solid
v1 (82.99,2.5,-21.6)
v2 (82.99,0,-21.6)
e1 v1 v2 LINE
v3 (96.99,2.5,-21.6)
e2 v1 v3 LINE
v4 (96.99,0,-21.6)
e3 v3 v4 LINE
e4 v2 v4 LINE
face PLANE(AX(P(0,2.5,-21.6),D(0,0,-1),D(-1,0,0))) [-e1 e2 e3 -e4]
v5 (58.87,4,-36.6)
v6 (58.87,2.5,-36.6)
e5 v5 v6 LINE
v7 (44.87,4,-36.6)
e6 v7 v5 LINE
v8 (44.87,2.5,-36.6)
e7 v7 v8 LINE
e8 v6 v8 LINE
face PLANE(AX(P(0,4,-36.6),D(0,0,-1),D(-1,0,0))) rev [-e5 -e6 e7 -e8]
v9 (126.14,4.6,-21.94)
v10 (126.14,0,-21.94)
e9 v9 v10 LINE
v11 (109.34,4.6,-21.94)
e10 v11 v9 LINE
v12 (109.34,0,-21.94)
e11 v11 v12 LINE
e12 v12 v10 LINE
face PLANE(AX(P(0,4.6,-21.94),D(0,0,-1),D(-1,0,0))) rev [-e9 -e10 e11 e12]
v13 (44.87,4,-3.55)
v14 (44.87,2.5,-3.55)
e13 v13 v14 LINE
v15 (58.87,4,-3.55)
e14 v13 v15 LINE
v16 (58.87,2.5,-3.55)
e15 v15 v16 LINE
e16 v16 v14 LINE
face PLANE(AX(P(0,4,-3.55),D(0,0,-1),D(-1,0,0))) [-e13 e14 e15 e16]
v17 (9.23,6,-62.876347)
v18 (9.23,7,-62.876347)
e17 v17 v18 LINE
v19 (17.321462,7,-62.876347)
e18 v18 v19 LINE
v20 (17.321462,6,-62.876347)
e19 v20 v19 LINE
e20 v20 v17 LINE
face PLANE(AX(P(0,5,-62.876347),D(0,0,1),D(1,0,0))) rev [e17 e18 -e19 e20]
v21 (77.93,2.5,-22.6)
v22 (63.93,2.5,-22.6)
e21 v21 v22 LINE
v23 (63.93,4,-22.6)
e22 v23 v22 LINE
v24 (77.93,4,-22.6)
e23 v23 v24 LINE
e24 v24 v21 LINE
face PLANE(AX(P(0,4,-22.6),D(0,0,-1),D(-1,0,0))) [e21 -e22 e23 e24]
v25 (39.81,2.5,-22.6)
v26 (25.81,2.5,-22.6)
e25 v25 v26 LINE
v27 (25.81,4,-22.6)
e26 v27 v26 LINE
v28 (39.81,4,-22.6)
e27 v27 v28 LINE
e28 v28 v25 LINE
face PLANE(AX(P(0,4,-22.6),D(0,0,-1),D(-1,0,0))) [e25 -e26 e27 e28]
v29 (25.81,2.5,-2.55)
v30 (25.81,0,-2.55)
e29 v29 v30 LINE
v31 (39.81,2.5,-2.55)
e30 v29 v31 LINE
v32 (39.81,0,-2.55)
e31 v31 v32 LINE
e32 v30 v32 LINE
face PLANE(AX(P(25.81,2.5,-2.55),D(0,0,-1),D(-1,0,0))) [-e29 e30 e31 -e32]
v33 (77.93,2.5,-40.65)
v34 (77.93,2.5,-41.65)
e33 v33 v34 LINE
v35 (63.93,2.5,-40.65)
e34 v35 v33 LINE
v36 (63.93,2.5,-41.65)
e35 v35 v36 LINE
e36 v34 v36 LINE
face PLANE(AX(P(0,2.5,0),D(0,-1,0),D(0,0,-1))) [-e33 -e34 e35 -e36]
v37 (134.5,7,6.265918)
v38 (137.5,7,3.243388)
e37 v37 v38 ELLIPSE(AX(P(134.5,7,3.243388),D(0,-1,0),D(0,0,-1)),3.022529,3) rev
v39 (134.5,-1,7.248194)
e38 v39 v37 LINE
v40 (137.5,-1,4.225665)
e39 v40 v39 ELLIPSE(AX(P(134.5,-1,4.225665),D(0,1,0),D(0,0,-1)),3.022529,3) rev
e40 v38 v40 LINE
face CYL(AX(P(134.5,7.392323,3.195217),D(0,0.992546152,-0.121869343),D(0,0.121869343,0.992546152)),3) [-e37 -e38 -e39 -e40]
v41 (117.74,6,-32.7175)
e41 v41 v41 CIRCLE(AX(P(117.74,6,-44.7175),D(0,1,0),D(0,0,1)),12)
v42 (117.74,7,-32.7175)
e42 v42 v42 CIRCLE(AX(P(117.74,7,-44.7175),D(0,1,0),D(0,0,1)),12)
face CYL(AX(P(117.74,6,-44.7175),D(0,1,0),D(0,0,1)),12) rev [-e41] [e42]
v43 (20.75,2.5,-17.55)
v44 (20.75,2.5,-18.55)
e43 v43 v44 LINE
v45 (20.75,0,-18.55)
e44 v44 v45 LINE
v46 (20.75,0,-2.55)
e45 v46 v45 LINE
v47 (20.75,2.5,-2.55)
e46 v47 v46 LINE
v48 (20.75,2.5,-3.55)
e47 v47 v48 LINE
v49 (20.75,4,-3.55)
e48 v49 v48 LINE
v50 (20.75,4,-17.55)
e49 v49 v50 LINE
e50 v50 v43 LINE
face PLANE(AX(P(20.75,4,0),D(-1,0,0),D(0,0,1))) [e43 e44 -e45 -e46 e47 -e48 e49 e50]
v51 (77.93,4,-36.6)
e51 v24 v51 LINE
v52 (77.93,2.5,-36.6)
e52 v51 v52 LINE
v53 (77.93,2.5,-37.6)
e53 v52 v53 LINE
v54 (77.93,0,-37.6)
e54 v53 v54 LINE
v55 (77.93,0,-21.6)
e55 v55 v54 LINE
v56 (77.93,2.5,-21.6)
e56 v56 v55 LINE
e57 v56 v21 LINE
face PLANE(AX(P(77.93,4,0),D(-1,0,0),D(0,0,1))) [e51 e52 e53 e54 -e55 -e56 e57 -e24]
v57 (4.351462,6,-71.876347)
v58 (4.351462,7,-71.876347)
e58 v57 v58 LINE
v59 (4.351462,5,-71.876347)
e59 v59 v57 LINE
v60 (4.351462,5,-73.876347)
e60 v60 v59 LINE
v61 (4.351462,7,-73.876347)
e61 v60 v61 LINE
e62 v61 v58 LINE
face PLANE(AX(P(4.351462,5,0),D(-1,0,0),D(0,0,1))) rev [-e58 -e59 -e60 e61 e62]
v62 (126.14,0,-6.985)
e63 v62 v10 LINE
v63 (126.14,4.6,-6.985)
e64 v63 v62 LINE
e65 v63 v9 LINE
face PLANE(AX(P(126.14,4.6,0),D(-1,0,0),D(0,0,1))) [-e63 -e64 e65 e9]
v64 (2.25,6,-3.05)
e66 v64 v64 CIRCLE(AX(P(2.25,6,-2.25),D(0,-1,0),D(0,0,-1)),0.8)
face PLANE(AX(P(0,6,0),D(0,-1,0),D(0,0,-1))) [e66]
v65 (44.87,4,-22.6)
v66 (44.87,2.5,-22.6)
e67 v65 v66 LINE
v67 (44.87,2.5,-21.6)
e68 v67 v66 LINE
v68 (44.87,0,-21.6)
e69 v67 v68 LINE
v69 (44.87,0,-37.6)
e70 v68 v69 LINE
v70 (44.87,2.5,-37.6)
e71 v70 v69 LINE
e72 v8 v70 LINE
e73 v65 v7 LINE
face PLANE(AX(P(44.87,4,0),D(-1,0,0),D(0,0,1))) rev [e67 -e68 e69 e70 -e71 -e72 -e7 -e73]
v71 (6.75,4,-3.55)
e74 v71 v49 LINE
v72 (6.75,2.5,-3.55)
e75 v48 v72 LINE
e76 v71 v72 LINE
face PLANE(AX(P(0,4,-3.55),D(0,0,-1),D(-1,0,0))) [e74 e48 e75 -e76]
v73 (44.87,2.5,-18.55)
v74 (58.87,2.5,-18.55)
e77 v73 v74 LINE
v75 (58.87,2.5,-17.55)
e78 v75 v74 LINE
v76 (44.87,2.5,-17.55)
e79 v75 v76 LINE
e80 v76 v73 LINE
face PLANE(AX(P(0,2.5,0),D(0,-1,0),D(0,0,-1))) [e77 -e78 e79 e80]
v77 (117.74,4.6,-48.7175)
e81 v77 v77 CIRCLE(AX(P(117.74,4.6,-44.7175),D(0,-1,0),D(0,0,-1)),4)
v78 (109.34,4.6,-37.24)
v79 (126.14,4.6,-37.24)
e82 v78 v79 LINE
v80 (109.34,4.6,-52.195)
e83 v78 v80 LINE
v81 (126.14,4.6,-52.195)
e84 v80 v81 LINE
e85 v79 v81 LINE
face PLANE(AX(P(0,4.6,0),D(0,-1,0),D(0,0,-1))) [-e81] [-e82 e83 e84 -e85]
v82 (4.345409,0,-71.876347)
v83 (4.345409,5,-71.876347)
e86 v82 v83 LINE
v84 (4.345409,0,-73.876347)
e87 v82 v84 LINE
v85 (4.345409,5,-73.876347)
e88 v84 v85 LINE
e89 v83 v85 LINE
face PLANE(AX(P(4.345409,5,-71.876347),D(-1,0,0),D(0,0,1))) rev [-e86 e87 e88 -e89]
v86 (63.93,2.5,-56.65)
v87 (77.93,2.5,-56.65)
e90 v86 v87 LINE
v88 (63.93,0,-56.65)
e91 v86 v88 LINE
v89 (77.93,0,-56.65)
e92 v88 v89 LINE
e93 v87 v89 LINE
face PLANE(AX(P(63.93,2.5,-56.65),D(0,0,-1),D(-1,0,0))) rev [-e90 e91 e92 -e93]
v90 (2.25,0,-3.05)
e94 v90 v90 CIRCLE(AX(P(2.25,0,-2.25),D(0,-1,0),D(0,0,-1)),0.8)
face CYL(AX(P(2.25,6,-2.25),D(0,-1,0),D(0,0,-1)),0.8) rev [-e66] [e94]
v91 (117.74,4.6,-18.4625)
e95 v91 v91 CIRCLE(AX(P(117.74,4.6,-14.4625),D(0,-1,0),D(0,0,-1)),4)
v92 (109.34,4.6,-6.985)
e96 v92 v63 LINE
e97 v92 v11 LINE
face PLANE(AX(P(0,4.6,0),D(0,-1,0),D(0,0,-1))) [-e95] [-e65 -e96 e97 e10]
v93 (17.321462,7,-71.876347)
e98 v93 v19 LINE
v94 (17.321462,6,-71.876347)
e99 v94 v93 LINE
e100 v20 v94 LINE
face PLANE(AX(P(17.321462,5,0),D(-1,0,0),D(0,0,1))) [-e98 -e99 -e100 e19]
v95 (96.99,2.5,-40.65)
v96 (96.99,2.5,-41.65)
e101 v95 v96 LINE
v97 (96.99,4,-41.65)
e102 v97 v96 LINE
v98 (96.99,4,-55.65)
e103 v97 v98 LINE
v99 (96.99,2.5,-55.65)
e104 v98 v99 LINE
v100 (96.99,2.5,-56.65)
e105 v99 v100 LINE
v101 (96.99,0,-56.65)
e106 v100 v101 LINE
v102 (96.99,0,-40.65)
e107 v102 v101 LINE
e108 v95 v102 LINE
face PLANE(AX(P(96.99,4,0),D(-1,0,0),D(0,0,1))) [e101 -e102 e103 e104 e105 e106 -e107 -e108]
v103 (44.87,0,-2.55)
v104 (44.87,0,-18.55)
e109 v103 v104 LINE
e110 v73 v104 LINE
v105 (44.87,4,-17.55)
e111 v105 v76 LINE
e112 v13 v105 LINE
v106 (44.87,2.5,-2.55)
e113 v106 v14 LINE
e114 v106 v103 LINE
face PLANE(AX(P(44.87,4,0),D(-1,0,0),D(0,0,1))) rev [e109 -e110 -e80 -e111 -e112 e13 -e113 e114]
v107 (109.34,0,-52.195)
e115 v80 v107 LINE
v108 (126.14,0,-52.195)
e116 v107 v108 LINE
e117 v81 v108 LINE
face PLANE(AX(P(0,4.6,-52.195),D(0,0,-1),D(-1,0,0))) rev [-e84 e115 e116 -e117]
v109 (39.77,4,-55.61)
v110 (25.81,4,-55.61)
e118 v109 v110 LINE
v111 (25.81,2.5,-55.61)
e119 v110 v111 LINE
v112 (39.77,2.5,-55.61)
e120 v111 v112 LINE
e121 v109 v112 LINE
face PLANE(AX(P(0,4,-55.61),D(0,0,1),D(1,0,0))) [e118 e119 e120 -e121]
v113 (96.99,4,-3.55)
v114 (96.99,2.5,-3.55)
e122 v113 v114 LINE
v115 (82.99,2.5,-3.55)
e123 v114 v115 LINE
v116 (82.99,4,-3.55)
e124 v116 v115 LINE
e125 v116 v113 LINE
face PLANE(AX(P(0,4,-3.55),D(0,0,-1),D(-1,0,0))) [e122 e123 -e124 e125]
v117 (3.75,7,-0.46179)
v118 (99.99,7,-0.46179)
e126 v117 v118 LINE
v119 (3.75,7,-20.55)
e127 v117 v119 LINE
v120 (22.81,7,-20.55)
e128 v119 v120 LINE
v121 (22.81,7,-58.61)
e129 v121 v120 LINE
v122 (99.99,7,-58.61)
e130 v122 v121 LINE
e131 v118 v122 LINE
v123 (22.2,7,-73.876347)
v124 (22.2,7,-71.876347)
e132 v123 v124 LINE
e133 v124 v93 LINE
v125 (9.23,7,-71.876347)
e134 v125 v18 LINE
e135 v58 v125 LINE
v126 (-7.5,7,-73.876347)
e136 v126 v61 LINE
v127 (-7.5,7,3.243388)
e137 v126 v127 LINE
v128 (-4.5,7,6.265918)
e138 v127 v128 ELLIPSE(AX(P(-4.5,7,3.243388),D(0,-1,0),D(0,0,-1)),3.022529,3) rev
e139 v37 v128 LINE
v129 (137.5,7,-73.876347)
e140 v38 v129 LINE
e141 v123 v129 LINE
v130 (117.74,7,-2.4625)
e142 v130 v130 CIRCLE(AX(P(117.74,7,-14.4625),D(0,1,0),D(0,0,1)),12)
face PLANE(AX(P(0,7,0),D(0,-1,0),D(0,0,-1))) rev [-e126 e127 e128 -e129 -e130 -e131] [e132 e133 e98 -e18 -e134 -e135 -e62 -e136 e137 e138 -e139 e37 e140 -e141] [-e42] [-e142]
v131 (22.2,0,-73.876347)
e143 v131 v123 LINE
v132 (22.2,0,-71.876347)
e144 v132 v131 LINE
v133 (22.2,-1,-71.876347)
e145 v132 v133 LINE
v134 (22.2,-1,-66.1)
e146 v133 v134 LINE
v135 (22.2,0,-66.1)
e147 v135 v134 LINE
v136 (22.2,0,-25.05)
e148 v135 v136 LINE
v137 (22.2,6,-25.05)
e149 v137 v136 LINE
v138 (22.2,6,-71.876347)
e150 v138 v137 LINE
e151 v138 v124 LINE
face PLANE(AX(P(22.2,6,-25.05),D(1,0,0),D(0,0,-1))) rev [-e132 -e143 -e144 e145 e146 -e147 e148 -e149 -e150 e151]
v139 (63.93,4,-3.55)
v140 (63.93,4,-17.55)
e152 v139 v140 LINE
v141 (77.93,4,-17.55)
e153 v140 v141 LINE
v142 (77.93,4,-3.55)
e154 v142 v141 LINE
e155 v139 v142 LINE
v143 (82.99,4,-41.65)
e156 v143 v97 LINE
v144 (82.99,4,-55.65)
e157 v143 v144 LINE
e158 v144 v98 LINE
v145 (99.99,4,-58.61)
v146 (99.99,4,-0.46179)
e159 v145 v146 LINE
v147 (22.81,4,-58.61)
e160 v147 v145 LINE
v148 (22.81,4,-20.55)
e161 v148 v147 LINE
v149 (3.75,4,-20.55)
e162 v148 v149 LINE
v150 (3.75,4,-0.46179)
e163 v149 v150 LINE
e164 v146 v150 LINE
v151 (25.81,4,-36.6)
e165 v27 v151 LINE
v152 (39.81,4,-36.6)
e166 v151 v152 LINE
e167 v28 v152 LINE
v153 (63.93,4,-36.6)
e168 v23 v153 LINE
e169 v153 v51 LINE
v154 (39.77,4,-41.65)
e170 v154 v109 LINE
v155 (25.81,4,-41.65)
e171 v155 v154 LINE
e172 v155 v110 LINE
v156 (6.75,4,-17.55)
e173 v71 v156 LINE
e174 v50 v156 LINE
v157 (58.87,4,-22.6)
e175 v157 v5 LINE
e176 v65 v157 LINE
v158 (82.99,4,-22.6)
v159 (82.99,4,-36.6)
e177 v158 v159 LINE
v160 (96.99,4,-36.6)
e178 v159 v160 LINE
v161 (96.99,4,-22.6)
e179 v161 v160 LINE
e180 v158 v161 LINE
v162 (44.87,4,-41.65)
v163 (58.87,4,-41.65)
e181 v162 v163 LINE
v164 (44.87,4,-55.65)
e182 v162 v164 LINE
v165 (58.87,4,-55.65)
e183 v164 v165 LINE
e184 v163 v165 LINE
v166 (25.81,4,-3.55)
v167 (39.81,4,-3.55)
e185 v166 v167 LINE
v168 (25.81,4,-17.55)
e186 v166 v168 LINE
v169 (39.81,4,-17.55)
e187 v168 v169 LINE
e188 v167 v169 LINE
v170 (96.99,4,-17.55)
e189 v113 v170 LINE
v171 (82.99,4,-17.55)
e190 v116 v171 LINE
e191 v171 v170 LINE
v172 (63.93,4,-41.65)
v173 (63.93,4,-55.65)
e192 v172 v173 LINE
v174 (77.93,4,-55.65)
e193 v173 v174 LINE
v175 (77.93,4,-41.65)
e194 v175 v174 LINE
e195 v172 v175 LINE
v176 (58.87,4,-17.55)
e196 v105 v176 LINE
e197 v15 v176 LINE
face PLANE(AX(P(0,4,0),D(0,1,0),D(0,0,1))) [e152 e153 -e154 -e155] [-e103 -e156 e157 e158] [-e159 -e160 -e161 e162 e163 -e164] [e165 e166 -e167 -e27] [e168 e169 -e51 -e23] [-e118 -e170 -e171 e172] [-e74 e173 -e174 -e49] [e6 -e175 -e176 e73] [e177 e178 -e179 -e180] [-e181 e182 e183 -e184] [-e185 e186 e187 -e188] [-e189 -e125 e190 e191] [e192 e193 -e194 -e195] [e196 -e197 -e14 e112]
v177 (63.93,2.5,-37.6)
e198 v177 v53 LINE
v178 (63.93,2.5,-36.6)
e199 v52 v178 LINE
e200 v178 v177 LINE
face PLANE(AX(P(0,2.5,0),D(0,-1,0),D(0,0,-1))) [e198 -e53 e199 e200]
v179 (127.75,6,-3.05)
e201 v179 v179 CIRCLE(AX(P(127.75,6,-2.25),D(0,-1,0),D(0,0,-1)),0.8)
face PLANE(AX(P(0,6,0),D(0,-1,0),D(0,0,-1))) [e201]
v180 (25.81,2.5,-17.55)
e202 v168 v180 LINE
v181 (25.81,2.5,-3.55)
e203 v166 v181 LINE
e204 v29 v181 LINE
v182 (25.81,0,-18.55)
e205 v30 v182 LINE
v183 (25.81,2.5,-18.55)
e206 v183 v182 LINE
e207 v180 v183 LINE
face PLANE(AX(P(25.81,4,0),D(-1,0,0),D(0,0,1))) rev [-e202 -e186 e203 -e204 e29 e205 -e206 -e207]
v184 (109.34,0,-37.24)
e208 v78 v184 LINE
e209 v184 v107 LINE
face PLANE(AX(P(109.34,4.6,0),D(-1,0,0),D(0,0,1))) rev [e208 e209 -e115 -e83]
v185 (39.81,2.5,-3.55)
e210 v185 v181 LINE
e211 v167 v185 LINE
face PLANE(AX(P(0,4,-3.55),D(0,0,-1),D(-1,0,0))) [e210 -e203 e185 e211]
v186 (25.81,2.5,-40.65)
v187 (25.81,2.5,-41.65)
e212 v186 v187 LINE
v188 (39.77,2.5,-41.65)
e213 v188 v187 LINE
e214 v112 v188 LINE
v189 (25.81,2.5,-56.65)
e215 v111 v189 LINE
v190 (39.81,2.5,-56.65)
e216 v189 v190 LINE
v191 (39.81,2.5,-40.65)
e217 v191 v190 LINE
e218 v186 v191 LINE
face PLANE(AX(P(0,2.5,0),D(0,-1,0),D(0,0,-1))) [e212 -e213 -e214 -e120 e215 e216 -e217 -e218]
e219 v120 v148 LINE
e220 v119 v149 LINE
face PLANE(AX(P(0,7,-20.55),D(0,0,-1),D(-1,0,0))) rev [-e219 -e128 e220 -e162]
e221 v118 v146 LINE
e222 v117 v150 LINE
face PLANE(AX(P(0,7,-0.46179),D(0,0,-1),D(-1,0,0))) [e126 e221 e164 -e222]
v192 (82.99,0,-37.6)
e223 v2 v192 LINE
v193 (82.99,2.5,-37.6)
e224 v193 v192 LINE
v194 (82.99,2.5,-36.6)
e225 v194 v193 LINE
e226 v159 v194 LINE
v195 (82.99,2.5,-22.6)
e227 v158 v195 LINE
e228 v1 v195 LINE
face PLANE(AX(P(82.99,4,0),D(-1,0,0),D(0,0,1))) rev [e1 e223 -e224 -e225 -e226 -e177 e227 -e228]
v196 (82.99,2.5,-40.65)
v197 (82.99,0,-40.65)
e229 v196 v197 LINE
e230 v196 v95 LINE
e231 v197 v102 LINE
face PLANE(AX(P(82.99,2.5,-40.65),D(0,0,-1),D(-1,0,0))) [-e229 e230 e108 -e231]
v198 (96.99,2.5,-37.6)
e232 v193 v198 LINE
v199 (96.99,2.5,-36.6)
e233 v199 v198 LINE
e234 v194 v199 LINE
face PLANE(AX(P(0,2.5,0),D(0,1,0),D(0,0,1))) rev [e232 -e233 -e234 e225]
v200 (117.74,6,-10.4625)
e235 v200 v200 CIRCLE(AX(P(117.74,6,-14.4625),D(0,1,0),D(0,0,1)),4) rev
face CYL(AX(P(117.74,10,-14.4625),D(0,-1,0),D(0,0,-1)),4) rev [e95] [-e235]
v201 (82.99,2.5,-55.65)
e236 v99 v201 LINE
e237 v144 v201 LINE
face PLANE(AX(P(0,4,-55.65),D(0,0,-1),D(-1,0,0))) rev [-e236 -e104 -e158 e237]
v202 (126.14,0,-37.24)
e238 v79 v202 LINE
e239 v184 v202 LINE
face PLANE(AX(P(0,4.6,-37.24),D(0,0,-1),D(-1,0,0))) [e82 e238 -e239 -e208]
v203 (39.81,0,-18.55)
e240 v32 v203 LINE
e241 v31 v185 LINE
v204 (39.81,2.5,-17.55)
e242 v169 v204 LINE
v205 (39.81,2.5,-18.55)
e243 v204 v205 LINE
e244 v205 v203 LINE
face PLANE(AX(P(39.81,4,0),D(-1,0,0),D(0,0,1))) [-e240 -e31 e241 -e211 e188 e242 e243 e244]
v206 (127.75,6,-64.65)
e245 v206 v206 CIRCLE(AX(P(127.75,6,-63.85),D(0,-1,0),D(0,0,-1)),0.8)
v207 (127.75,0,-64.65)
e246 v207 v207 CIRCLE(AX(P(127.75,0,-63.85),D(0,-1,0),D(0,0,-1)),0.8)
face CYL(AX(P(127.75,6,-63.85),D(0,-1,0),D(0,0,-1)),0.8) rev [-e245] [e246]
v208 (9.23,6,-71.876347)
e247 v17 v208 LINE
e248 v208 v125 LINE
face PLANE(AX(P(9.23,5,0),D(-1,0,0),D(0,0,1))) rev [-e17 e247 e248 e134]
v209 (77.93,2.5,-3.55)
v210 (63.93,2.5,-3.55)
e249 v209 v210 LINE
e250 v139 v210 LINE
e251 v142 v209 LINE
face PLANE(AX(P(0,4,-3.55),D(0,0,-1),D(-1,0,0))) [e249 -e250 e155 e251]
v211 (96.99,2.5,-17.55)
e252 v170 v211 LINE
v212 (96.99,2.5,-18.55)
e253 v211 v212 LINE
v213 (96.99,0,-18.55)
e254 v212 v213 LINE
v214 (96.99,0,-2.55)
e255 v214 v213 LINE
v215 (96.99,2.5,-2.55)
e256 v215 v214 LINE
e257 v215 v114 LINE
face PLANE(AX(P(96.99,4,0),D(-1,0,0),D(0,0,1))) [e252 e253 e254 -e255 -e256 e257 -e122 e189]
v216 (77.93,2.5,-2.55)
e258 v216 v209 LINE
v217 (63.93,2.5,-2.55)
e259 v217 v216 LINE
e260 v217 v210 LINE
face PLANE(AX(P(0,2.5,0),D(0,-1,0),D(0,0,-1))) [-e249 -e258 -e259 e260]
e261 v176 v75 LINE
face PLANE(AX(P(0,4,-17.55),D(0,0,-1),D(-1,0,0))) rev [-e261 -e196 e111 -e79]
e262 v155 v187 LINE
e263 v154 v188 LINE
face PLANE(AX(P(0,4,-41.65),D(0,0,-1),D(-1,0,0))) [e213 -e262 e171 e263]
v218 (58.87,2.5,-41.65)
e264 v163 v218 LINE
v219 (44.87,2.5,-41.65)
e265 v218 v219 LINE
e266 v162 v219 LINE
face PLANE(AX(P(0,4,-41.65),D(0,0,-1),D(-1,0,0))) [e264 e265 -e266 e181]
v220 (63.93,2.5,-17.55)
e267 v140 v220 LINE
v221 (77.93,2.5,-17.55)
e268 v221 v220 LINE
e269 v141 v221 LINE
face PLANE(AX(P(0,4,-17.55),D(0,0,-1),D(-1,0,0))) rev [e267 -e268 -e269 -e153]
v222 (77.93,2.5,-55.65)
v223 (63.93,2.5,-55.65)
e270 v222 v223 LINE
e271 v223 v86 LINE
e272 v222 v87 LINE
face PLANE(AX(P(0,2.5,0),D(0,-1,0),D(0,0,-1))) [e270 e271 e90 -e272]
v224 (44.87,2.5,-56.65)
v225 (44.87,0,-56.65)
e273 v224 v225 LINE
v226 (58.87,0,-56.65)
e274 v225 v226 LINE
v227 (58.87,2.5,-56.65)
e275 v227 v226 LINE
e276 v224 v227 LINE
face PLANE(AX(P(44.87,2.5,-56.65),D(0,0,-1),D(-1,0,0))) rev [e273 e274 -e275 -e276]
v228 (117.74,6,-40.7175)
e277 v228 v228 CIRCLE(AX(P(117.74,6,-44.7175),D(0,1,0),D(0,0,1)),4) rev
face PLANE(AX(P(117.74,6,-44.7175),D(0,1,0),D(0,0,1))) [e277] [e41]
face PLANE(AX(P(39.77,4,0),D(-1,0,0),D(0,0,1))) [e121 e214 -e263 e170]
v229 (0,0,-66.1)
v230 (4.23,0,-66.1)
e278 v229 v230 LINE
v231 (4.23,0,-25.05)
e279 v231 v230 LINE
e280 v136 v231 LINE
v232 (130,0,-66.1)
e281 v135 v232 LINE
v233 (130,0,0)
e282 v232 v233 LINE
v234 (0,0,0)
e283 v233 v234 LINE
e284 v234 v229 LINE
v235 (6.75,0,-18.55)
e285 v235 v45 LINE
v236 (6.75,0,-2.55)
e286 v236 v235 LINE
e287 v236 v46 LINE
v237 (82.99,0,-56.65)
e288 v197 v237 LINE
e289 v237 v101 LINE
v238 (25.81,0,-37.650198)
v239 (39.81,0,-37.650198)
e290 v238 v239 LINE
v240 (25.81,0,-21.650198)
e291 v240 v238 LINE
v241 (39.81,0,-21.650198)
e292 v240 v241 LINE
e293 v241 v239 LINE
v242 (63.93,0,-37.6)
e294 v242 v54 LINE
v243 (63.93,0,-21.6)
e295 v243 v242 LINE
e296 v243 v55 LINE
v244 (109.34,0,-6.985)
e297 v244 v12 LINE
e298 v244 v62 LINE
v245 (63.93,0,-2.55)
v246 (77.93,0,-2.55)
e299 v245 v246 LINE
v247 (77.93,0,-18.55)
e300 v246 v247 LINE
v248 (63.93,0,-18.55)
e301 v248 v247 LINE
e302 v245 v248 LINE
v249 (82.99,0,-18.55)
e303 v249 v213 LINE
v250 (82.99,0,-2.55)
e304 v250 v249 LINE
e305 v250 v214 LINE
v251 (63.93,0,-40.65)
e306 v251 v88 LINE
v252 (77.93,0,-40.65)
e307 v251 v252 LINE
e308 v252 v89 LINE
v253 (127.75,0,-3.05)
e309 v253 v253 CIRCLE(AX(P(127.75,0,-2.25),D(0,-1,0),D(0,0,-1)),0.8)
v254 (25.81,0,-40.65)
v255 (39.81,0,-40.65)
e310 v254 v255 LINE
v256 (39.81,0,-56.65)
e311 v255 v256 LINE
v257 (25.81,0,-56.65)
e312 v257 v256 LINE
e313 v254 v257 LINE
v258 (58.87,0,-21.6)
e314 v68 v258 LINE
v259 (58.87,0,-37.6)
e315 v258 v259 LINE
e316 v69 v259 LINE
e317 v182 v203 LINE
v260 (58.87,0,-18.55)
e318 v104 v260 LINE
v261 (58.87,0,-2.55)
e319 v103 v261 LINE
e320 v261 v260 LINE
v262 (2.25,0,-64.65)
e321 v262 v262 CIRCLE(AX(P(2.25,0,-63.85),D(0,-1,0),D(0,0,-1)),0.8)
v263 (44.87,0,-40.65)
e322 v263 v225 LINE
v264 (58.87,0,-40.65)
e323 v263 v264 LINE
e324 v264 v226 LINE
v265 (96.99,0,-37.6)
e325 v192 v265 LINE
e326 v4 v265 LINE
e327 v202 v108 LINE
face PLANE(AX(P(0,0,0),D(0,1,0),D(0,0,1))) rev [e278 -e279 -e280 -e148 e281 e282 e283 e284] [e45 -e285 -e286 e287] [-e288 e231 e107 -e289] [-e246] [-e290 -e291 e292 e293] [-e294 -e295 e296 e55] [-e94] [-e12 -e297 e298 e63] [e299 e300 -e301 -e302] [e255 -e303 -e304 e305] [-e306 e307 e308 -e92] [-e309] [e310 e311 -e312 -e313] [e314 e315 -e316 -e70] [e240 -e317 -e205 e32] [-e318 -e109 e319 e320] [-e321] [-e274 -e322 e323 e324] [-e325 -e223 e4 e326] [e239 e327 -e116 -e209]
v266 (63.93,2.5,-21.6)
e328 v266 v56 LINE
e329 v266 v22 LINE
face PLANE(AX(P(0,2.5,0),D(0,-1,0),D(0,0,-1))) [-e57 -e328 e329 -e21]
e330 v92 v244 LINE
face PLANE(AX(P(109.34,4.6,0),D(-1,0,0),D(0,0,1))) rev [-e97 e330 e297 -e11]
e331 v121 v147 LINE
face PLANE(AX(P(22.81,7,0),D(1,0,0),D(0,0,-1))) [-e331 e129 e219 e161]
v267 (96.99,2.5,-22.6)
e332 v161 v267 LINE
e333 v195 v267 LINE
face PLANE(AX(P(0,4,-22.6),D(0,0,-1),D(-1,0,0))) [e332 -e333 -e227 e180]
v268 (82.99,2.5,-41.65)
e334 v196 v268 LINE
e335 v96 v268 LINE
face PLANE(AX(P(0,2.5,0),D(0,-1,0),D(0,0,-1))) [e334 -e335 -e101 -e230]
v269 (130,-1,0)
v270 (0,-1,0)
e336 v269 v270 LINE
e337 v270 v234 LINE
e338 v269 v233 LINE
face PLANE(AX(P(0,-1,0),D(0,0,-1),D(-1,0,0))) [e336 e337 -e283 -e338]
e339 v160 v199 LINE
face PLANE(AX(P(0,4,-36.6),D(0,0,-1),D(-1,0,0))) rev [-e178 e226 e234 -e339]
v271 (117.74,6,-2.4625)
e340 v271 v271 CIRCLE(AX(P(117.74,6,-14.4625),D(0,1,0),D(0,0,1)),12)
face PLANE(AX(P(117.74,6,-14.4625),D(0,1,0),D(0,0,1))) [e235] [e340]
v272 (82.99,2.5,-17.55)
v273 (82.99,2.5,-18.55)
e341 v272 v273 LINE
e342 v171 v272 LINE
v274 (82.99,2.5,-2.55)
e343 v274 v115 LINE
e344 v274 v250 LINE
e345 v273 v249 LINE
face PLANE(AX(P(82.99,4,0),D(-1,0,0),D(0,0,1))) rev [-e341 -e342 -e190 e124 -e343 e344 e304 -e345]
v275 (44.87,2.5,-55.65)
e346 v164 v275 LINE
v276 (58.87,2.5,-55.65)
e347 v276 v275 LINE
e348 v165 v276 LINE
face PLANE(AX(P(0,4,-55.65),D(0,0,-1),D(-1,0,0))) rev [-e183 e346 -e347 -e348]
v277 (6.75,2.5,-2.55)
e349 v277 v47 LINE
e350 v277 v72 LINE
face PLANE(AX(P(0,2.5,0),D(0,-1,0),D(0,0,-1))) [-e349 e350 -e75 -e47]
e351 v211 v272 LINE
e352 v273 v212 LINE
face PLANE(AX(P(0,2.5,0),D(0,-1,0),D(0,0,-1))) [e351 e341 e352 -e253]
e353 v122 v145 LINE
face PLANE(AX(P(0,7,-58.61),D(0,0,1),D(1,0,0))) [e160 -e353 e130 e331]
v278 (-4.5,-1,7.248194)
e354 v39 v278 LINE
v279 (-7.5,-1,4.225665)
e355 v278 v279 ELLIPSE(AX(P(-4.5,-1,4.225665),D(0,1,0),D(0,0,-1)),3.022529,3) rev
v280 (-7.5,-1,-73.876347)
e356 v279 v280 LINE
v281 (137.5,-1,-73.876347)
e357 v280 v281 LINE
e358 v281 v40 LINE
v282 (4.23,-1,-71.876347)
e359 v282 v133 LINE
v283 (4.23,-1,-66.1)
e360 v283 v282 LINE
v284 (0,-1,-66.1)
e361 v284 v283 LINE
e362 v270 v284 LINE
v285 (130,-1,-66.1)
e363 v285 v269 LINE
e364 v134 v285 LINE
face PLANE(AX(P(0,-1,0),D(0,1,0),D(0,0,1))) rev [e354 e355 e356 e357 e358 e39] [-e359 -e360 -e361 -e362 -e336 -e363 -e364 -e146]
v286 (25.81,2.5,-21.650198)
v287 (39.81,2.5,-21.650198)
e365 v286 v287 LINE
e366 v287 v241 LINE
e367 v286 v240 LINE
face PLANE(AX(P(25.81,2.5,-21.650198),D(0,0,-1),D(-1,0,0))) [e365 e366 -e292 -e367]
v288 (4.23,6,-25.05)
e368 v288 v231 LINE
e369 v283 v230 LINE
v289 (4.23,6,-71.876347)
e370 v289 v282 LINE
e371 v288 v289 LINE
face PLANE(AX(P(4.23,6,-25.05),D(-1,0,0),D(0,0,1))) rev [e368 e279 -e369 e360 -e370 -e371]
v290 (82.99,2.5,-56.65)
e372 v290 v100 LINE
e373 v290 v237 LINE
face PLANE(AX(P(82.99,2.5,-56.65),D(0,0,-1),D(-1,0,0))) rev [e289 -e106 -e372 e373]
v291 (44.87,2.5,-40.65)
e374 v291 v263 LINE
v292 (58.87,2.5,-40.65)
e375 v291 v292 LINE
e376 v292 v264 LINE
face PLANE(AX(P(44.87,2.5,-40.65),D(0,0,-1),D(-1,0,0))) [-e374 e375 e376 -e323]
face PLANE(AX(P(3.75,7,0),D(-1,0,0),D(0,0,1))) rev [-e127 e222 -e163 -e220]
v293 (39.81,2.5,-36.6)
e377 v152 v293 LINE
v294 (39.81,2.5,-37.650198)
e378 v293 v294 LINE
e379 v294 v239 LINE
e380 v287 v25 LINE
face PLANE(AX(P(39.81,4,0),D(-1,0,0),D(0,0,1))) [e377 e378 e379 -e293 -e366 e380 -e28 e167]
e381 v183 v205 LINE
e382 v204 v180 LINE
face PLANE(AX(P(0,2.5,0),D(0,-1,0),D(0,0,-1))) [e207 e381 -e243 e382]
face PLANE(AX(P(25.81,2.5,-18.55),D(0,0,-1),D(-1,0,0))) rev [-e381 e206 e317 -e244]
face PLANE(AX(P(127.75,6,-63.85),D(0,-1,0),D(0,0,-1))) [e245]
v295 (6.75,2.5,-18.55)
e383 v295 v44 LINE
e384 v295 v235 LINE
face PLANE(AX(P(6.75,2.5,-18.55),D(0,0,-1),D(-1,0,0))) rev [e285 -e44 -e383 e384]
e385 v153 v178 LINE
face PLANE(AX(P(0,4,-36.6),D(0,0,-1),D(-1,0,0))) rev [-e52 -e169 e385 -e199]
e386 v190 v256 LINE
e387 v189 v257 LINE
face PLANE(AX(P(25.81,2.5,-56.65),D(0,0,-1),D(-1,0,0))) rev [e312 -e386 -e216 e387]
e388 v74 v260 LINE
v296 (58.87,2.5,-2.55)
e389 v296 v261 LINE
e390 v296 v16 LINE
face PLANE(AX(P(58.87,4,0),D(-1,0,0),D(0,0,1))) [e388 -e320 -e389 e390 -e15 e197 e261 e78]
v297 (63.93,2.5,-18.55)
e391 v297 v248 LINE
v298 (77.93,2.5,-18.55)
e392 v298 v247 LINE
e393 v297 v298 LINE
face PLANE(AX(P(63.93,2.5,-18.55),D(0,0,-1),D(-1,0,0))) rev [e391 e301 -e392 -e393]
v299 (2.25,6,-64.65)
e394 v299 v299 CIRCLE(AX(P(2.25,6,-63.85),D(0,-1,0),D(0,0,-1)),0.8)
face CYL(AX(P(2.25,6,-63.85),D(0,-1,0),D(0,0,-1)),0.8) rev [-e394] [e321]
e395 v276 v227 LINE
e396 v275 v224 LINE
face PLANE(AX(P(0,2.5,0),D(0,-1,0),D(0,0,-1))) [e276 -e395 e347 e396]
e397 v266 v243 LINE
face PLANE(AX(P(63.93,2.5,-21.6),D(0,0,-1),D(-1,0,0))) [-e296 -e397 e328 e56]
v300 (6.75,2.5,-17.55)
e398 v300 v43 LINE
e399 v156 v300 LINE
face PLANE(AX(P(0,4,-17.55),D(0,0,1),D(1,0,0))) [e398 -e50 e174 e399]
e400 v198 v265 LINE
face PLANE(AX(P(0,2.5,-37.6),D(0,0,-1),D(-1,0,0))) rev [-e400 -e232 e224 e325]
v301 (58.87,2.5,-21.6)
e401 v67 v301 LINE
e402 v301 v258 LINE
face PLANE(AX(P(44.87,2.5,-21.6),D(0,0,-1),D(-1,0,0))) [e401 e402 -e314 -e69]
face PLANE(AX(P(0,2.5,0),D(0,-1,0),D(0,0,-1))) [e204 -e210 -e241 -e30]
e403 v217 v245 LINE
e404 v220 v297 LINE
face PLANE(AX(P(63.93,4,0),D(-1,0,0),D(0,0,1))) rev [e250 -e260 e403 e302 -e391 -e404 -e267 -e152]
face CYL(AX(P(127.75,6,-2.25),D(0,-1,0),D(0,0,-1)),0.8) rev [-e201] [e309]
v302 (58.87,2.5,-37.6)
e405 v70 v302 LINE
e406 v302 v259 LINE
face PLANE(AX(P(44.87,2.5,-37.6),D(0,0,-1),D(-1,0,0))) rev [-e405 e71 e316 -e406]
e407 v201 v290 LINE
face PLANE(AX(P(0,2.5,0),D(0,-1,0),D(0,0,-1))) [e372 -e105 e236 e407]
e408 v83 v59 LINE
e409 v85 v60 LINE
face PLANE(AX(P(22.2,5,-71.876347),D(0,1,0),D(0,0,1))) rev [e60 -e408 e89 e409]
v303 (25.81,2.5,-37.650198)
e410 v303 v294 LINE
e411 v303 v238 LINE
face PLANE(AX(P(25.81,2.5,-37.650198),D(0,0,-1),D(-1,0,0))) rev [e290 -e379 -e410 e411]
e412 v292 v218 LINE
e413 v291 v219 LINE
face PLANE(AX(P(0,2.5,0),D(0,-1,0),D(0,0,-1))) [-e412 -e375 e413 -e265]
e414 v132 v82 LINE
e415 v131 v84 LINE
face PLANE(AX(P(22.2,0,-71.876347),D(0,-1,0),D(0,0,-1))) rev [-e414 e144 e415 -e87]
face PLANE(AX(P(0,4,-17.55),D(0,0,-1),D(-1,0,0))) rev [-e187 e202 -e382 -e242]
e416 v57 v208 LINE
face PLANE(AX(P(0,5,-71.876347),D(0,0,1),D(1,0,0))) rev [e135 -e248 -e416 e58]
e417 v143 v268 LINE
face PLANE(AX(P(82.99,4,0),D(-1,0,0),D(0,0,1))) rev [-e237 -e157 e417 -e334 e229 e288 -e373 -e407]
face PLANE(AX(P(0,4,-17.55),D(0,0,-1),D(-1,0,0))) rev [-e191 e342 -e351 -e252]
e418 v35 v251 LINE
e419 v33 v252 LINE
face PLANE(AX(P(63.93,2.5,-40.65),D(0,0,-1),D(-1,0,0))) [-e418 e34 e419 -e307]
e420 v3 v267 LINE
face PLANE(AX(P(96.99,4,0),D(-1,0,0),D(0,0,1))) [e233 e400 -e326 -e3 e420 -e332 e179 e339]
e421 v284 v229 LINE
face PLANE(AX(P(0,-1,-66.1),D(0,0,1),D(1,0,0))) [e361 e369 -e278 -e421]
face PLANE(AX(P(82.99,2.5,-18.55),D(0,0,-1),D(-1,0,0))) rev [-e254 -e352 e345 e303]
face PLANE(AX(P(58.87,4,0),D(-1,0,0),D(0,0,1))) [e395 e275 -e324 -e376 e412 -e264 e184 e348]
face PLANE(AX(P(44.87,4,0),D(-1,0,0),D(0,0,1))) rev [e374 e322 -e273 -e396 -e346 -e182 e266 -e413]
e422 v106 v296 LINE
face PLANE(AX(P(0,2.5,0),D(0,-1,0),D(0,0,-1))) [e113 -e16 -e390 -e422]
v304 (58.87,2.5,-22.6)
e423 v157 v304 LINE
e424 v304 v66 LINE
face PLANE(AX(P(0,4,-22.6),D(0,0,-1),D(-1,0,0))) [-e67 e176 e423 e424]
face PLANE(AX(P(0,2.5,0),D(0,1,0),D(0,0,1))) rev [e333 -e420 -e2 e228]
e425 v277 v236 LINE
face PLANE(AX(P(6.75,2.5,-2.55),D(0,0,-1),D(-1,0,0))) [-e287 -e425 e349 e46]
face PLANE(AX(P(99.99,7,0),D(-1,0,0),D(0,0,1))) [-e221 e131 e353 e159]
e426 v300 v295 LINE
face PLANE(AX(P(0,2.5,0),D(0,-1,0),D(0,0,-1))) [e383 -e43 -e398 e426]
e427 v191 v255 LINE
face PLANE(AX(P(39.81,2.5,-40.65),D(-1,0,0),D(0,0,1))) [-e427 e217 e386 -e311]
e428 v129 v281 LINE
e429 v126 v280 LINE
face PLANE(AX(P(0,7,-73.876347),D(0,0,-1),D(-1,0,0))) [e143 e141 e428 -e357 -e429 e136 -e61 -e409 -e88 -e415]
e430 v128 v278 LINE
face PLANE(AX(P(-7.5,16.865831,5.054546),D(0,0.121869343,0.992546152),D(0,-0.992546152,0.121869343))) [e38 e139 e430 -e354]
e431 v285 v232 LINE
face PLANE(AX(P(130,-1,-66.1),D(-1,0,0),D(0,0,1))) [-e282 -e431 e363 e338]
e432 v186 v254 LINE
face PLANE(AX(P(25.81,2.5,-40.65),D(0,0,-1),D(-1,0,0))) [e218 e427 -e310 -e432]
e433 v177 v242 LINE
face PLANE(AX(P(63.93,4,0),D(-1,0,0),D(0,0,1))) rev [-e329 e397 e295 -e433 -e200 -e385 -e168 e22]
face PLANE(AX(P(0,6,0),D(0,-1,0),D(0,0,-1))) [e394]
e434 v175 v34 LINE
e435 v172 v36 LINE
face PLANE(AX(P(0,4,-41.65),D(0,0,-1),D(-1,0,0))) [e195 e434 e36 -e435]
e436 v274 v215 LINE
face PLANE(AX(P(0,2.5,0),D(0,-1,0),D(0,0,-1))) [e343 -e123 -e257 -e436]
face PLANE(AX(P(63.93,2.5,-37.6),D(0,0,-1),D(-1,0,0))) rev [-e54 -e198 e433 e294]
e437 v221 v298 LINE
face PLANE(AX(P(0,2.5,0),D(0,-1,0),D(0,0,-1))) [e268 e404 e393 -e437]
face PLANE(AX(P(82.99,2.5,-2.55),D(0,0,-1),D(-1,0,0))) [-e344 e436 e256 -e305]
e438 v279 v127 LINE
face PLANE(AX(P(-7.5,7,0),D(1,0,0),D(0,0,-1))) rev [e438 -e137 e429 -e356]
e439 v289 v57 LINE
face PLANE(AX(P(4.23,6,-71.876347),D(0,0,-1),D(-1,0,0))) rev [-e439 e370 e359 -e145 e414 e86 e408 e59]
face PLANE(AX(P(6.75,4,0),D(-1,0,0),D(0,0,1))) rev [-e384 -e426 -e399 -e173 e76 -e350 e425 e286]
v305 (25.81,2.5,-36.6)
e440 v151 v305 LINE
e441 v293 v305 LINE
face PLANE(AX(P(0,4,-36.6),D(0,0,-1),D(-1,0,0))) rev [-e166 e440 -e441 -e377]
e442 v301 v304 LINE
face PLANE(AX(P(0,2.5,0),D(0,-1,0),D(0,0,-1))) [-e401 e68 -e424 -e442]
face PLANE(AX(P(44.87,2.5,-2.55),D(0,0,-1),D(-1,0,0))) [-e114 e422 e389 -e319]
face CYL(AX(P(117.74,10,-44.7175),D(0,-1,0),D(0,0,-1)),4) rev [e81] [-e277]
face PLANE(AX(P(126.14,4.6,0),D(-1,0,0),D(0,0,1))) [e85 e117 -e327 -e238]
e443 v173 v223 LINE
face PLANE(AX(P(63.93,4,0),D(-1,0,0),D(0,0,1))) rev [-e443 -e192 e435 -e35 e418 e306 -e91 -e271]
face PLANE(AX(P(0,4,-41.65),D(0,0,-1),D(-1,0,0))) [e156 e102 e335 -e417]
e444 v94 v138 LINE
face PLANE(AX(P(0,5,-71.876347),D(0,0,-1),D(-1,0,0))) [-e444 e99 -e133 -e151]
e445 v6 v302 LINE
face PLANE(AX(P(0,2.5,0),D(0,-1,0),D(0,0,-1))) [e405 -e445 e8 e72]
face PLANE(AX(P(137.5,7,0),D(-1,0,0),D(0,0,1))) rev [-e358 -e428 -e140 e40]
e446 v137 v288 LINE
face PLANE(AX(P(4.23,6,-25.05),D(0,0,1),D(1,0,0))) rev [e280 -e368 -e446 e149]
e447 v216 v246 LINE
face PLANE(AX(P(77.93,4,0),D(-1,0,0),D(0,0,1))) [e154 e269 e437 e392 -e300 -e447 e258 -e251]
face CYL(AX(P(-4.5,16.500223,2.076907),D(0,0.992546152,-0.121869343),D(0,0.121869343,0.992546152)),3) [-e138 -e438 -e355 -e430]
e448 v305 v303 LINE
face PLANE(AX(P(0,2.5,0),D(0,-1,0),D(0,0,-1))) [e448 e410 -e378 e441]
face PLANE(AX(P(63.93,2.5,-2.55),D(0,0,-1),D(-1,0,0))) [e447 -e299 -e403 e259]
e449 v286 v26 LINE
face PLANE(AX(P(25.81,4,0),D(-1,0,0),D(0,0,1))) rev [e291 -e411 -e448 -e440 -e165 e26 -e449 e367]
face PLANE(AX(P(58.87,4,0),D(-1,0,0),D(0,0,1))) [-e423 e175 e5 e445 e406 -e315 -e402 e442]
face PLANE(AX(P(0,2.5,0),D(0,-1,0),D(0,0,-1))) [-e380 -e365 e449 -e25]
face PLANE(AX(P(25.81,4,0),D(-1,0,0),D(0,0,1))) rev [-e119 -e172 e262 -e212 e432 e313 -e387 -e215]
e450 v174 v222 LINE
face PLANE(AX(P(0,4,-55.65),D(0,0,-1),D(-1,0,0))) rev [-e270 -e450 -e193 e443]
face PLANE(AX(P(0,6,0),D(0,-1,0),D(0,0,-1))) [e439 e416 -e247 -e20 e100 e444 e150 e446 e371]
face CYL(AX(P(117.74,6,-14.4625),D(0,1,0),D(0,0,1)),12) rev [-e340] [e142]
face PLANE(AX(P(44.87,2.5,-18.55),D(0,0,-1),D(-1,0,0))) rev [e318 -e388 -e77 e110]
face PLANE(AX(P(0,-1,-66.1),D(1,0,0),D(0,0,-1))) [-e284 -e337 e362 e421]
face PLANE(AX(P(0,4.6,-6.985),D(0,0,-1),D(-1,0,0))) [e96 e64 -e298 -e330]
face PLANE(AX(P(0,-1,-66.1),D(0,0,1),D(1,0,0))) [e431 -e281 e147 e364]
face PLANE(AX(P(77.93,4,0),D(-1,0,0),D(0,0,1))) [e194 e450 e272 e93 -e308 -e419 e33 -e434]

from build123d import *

# Parameters (mm, degrees)
SKETCH1_W           = 14
SKETCH1_H           = 14
SKETCH1_W_2         = 13.96
SKETCH1_H_2         = 13.96
SKETCH1_W_3         = 17.83
SKETCH1_H_3         = 34.365
SKETCH1_W_4         = 16.8
SKETCH1_H_4         = 14.955
BOSS_EXTRUDE2_DEPTH = 4
SKETCH3_W           = 14
SKETCH3_H           = 16
CUT_EXTRUDE1_DEPTH  = 2.5
SKETCH6_W           = 145
SKETCH6_H           = 81.124541
BOSS_EXTRUDE3_DEPTH = 7
SKETCH12_R          = 0.8
CUT_EXTRUDE5_DEPTH  = 6
SKETCH13_W          = 17.97
SKETCH13_H          = 46.826347
CUT_EXTRUDE6_DEPTH  = 6
SKETCH14_W          = 16.8
SKETCH14_H          = 14.955
CUT_EXTRUDE8_DEPTH  = 4.6
SKETCH15_R          = 4
CUT_EXTRUDE9_DEPTH  = 10
SKETCH16_R          = 12
CUT_EXTRUDE10_DEPTH = 1
SKETCH20_W          = 145
SKETCH20_H          = 81.124541
SKETCH20_W_2        = 130
SKETCH20_H_2        = 66.1
BOSS_EXTRUDE5_DEPTH = 1
SKETCH21_W          = 145
SKETCH21_H          = 34.866824831
CUT_EXTRUDE11_DEPTH = 18
FILLET1_R           = 3
SKETCH27_W          = 17.97
SKETCH27_H          = 5.776347
CUT_EXTRUDE13_DEPTH = 2
CUT_EXTRUDE14_START = -2
CUT_EXTRUDE14_DEPTH = 2
SKETCH28_W          = 17.854591413
SKETCH28_H          = 5
CUT_EXTRUDE15_DEPTH = 2


# Read off the part's stored shape, not the designer's step: Cut-Extrude14
with BuildPart() as part:
    # Sketch1 → Boss-Extrude2 (new body)
    with BuildSketch(Plane(origin=(0, 0, 0), x_dir=(1, 0, 0), z_dir=(0, 1, 0))):
        Polygon((0, 0), (109.34, 0), (130, 0), (130, 66.1), (0, 66.1), align=None)
        with Locations((51.87, 10.55)):
            Rectangle(SKETCH1_W, SKETCH1_H, mode=Mode.SUBTRACT)
        with Locations((32.81, 10.55)):
            Rectangle(SKETCH1_W, SKETCH1_H, mode=Mode.SUBTRACT)
        with Locations((32.81, 29.6)):
            Rectangle(SKETCH1_W, SKETCH1_H, mode=Mode.SUBTRACT)
        with Locations((32.79, 48.63)):
            Rectangle(SKETCH1_W_2, SKETCH1_H_2, mode=Mode.SUBTRACT)
        with Locations((13.145, 42.2325)):
            Rectangle(SKETCH1_W_3, SKETCH1_H_3, mode=Mode.SUBTRACT)
        with Locations((13.75, 10.55)):
            Rectangle(SKETCH1_W, SKETCH1_H, mode=Mode.SUBTRACT)
        with Locations((51.87, 29.6)):
            Rectangle(SKETCH1_W, SKETCH1_H, mode=Mode.SUBTRACT)
        with Locations((70.93, 10.55)):
            Rectangle(SKETCH1_W, SKETCH1_H, mode=Mode.SUBTRACT)
        with Locations((89.99, 10.55)):
            Rectangle(SKETCH1_W, SKETCH1_H, mode=Mode.SUBTRACT)
        with Locations((117.74, 14.4625)):
            Rectangle(SKETCH1_W_4, SKETCH1_H_4, mode=Mode.SUBTRACT)
        with Locations((70.93, 29.6)):
            Rectangle(SKETCH1_W, SKETCH1_H, mode=Mode.SUBTRACT)
        with Locations((89.99, 29.6)):
            Rectangle(SKETCH1_W, SKETCH1_H, mode=Mode.SUBTRACT)
        with Locations((51.87, 48.65)):
            Rectangle(SKETCH1_W, SKETCH1_H, mode=Mode.SUBTRACT)
        with Locations((70.93, 48.65)):
            Rectangle(SKETCH1_W, SKETCH1_H, mode=Mode.SUBTRACT)
        with Locations((89.99, 48.65)):
            Rectangle(SKETCH1_W, SKETCH1_H, mode=Mode.SUBTRACT)
        with Locations((117.74, 44.7175)):
            Rectangle(SKETCH1_W_4, SKETCH1_H_4, mode=Mode.SUBTRACT)
    extrude(amount=BOSS_EXTRUDE2_DEPTH)

    # Sketch3 → Cut-Extrude1 (cut)
    with BuildSketch(Plane(origin=(0, 0, 0), x_dir=(1, 0, 0), z_dir=(0, 1, 0))):
        with Locations((89.99, 29.6)):
            Rectangle(SKETCH3_W, SKETCH3_H)
        with Locations((70.93, 29.6)):
            Rectangle(SKETCH3_W, SKETCH3_H)
        with Locations((89.99, 48.65)):
            Rectangle(SKETCH3_W, SKETCH3_H)
        with Locations((70.93, 48.65)):
            Rectangle(SKETCH3_W, SKETCH3_H)
        with Locations((51.87, 48.65)):
            Rectangle(SKETCH3_W, SKETCH3_H)
        with Locations((32.81, 48.65)):
            Rectangle(SKETCH3_W, SKETCH3_H)
        with Locations((32.81, 29.650197757)):
            Rectangle(SKETCH3_W, SKETCH3_H)
        with Locations((51.87, 29.6)):
            Rectangle(SKETCH3_W, SKETCH3_H)
        with Locations((13.75, 10.55)):
            Rectangle(SKETCH3_W, SKETCH3_H)
        with Locations((32.81, 10.55)):
            Rectangle(SKETCH3_W, SKETCH3_H)
        with Locations((51.87, 10.55)):
            Rectangle(SKETCH3_W, SKETCH3_H)
        with Locations((70.93, 10.55)):
            Rectangle(SKETCH3_W, SKETCH3_H)
        with Locations((89.99, 10.55)):
            Rectangle(SKETCH3_W, SKETCH3_H)
    extrude(amount=CUT_EXTRUDE1_DEPTH, mode=Mode.SUBTRACT)

    # Sketch6 → Boss-Extrude3 (add)
    with BuildSketch(Plane(origin=(0, 0, 0), x_dir=(-1, 0, 0), z_dir=(0, -1, 0))):
        with Locations((-65, 33.3140765)):
            Rectangle(SKETCH6_W, SKETCH6_H)
        Polygon((-99.99, 58.61), (-39.77, 58.61), (-22.81, 58.61), (-22.81, 53.222321133), (-22.81, 20.55), (-3.75, 20.55), (-3.75, 12.496372948), (-3.75, 0.461789698), (-20.75, 0.461789698), (-99.99, 0.461789698), align=None, mode=Mode.SUBTRACT)
    extrude(amount=-BOSS_EXTRUDE3_DEPTH)

    # Sketch12 → Cut-Extrude5 (cut)
    with BuildSketch(Plane(origin=(0, 0, 0), x_dir=(-1, 0, 0), z_dir=(0, -1, 0))):
        with BuildLine():
            ThreePointArc((-1.45, 63.85), (-1.684314575, 64.415685425), (-2.25, 64.65))
            Line((-2.25, 64.65), (-2.25, 63.85))
            Line((-2.25, 63.85), (-1.45, 63.85))
        make_face()
        with BuildLine():
            Line((-2.25, 63.85), (-2.25, 64.65))
            ThreePointArc((-2.25, 64.65), (-2.815685425, 63.284314575), (-1.45, 63.85))
            Line((-1.45, 63.85), (-2.25, 63.85))
        make_face()
        with BuildLine():
            ThreePointArc((-1.45, 2.25), (-2.815685425, 2.815685425), (-2.25, 1.45))
            Line((-2.25, 1.45), (-2.25, 2.25))
            Line((-2.25, 2.25), (-1.45, 2.25))
        make_face()
        with BuildLine():
            Line((-2.25, 2.25), (-2.25, 1.45))
            ThreePointArc((-2.25, 1.45), (-1.684314575, 1.684314575), (-1.45, 2.25))
            Line((-1.45, 2.25), (-2.25, 2.25))
        make_face()
        with BuildLine():
            ThreePointArc((-128.55, 2.25), (-128.315685425, 1.684314575), (-127.75, 1.45))
            Line((-127.75, 1.45), (-127.75, 2.25))
            Line((-127.75, 2.25), (-128.55, 2.25))
        make_face()
        with BuildLine():
            Line((-127.75, 2.25), (-127.75, 1.45))
            ThreePointArc((-127.75, 1.45), (-127.184314575, 1.684314575), (-126.95, 2.25))
            ThreePointArc((-126.95, 2.25), (-127.75, 3.05), (-128.55, 2.25))
            Line((-128.55, 2.25), (-127.75, 2.25))
        make_face()
        with Locations(Location((-127.75, 63.85, 0), (0, 0, 90))):
            Circle(SKETCH12_R)
    extrude(amount=-CUT_EXTRUDE5_DEPTH, mode=Mode.SUBTRACT)

    # Sketch13 → Cut-Extrude6 (cut)
    with BuildSketch(Plane.XZ):
        with Locations((13.215, -48.4631735)):
            Rectangle(SKETCH13_W, SKETCH13_H)
    extrude(amount=-CUT_EXTRUDE6_DEPTH, mode=Mode.SUBTRACT)

    # Sketch14 → Cut-Extrude8 (cut)
    with BuildSketch(Plane.XZ):
        with Locations((117.74, -14.4625)):
            Rectangle(SKETCH14_W, SKETCH14_H)
        with Locations((117.74, -44.7175)):
            Rectangle(SKETCH14_W, SKETCH14_H)
    extrude(amount=-CUT_EXTRUDE8_DEPTH, mode=Mode.SUBTRACT)

    # Sketch15 → Cut-Extrude9 (cut)
    with BuildSketch(Plane.XZ):
        with Locations(Location((117.74, -44.7175, 0), (0, 0, 270))):
            Circle(SKETCH15_R)
        with Locations(Location((117.74, -14.4625, 0), (0, 0, 270))):
            Circle(SKETCH15_R)
    extrude(amount=-CUT_EXTRUDE9_DEPTH, mode=Mode.SUBTRACT)

    # Sketch16 → Cut-Extrude10 (cut)
    with BuildSketch(Plane(origin=(0, 7, 0), x_dir=(1, 0, 0), z_dir=(0, 1, 0))):
        with Locations(Location((117.74, 44.7175, 0), (0, 0, 270))):
            Circle(SKETCH16_R)
        with Locations(Location((117.74, 14.4625, 0), (0, 0, 270))):
            Circle(SKETCH16_R)
    extrude(amount=-CUT_EXTRUDE10_DEPTH, mode=Mode.SUBTRACT)

    # Sketch20 → Boss-Extrude5 (add)
    with BuildSketch(Plane.XZ):
        with Locations((65, -33.3140765)):
            Rectangle(SKETCH20_W, SKETCH20_H)
        with Locations((65, -33.05)):
            Rectangle(SKETCH20_W_2, SKETCH20_H_2, mode=Mode.SUBTRACT)
    extrude(amount=BOSS_EXTRUDE5_DEPTH)

    # Sketch21 → Cut-Extrude11 (cut)
    with BuildSketch(Plane(origin=(0, -1.861896279, 0.228612117), x_dir=(-1, 0, 0), z_dir=(0, 0.9925461516413211, -0.1218693434051548))):
        with Locations((-65, 24.505710134)):
            Rectangle(SKETCH21_W, SKETCH21_H)
    extrude(amount=CUT_EXTRUDE11_DEPTH, mode=Mode.SUBTRACT)

    # Fillet1
    fillet1_edges = [part.edges().sort_by_distance(p)[0] for p in [
        (-7.5, 3, 6.757055756),
        (137.5, 3, 6.757055756),
    ]]
    fillet(fillet1_edges, radius=FILLET1_R)

    # Sketch27 → Cut-Extrude13 (cut)
    with BuildSketch(Plane.XZ):
        with Locations((13.215, -68.9881735)):
            Rectangle(SKETCH27_W, SKETCH27_H)
    extrude(amount=CUT_EXTRUDE13_DEPTH, mode=Mode.SUBTRACT)

    # Cut-Extrude14 outline → Cut-Extrude14 (cut)
    with BuildSketch(Plane(origin=(0, 7, 0), x_dir=(1, 0, 0), z_dir=(0, 1, 0)).offset(CUT_EXTRUDE14_START)):
        Polygon((4.351462148, 71.876347), (9.23, 71.876347), (9.23, 62.876347), (17.321462297, 62.876347), (17.321462297, 71.876347), (22.2, 71.876347), (22.2, 73.876347), (4.351462148, 73.876347), align=None)
    extrude(amount=CUT_EXTRUDE14_DEPTH, mode=Mode.SUBTRACT)

    # Sketch28 → Cut-Extrude15 (cut)
    with BuildSketch(Plane(origin=(0, 0, -73.876347), x_dir=(-1, 0, 0), z_dir=(0, 0, -1))):
        with Locations((-13.272704442, 2.5)):
            Rectangle(SKETCH28_W, SKETCH28_H)
    extrude(amount=-CUT_EXTRUDE15_DEPTH, mode=Mode.SUBTRACT)


solid = part.part
